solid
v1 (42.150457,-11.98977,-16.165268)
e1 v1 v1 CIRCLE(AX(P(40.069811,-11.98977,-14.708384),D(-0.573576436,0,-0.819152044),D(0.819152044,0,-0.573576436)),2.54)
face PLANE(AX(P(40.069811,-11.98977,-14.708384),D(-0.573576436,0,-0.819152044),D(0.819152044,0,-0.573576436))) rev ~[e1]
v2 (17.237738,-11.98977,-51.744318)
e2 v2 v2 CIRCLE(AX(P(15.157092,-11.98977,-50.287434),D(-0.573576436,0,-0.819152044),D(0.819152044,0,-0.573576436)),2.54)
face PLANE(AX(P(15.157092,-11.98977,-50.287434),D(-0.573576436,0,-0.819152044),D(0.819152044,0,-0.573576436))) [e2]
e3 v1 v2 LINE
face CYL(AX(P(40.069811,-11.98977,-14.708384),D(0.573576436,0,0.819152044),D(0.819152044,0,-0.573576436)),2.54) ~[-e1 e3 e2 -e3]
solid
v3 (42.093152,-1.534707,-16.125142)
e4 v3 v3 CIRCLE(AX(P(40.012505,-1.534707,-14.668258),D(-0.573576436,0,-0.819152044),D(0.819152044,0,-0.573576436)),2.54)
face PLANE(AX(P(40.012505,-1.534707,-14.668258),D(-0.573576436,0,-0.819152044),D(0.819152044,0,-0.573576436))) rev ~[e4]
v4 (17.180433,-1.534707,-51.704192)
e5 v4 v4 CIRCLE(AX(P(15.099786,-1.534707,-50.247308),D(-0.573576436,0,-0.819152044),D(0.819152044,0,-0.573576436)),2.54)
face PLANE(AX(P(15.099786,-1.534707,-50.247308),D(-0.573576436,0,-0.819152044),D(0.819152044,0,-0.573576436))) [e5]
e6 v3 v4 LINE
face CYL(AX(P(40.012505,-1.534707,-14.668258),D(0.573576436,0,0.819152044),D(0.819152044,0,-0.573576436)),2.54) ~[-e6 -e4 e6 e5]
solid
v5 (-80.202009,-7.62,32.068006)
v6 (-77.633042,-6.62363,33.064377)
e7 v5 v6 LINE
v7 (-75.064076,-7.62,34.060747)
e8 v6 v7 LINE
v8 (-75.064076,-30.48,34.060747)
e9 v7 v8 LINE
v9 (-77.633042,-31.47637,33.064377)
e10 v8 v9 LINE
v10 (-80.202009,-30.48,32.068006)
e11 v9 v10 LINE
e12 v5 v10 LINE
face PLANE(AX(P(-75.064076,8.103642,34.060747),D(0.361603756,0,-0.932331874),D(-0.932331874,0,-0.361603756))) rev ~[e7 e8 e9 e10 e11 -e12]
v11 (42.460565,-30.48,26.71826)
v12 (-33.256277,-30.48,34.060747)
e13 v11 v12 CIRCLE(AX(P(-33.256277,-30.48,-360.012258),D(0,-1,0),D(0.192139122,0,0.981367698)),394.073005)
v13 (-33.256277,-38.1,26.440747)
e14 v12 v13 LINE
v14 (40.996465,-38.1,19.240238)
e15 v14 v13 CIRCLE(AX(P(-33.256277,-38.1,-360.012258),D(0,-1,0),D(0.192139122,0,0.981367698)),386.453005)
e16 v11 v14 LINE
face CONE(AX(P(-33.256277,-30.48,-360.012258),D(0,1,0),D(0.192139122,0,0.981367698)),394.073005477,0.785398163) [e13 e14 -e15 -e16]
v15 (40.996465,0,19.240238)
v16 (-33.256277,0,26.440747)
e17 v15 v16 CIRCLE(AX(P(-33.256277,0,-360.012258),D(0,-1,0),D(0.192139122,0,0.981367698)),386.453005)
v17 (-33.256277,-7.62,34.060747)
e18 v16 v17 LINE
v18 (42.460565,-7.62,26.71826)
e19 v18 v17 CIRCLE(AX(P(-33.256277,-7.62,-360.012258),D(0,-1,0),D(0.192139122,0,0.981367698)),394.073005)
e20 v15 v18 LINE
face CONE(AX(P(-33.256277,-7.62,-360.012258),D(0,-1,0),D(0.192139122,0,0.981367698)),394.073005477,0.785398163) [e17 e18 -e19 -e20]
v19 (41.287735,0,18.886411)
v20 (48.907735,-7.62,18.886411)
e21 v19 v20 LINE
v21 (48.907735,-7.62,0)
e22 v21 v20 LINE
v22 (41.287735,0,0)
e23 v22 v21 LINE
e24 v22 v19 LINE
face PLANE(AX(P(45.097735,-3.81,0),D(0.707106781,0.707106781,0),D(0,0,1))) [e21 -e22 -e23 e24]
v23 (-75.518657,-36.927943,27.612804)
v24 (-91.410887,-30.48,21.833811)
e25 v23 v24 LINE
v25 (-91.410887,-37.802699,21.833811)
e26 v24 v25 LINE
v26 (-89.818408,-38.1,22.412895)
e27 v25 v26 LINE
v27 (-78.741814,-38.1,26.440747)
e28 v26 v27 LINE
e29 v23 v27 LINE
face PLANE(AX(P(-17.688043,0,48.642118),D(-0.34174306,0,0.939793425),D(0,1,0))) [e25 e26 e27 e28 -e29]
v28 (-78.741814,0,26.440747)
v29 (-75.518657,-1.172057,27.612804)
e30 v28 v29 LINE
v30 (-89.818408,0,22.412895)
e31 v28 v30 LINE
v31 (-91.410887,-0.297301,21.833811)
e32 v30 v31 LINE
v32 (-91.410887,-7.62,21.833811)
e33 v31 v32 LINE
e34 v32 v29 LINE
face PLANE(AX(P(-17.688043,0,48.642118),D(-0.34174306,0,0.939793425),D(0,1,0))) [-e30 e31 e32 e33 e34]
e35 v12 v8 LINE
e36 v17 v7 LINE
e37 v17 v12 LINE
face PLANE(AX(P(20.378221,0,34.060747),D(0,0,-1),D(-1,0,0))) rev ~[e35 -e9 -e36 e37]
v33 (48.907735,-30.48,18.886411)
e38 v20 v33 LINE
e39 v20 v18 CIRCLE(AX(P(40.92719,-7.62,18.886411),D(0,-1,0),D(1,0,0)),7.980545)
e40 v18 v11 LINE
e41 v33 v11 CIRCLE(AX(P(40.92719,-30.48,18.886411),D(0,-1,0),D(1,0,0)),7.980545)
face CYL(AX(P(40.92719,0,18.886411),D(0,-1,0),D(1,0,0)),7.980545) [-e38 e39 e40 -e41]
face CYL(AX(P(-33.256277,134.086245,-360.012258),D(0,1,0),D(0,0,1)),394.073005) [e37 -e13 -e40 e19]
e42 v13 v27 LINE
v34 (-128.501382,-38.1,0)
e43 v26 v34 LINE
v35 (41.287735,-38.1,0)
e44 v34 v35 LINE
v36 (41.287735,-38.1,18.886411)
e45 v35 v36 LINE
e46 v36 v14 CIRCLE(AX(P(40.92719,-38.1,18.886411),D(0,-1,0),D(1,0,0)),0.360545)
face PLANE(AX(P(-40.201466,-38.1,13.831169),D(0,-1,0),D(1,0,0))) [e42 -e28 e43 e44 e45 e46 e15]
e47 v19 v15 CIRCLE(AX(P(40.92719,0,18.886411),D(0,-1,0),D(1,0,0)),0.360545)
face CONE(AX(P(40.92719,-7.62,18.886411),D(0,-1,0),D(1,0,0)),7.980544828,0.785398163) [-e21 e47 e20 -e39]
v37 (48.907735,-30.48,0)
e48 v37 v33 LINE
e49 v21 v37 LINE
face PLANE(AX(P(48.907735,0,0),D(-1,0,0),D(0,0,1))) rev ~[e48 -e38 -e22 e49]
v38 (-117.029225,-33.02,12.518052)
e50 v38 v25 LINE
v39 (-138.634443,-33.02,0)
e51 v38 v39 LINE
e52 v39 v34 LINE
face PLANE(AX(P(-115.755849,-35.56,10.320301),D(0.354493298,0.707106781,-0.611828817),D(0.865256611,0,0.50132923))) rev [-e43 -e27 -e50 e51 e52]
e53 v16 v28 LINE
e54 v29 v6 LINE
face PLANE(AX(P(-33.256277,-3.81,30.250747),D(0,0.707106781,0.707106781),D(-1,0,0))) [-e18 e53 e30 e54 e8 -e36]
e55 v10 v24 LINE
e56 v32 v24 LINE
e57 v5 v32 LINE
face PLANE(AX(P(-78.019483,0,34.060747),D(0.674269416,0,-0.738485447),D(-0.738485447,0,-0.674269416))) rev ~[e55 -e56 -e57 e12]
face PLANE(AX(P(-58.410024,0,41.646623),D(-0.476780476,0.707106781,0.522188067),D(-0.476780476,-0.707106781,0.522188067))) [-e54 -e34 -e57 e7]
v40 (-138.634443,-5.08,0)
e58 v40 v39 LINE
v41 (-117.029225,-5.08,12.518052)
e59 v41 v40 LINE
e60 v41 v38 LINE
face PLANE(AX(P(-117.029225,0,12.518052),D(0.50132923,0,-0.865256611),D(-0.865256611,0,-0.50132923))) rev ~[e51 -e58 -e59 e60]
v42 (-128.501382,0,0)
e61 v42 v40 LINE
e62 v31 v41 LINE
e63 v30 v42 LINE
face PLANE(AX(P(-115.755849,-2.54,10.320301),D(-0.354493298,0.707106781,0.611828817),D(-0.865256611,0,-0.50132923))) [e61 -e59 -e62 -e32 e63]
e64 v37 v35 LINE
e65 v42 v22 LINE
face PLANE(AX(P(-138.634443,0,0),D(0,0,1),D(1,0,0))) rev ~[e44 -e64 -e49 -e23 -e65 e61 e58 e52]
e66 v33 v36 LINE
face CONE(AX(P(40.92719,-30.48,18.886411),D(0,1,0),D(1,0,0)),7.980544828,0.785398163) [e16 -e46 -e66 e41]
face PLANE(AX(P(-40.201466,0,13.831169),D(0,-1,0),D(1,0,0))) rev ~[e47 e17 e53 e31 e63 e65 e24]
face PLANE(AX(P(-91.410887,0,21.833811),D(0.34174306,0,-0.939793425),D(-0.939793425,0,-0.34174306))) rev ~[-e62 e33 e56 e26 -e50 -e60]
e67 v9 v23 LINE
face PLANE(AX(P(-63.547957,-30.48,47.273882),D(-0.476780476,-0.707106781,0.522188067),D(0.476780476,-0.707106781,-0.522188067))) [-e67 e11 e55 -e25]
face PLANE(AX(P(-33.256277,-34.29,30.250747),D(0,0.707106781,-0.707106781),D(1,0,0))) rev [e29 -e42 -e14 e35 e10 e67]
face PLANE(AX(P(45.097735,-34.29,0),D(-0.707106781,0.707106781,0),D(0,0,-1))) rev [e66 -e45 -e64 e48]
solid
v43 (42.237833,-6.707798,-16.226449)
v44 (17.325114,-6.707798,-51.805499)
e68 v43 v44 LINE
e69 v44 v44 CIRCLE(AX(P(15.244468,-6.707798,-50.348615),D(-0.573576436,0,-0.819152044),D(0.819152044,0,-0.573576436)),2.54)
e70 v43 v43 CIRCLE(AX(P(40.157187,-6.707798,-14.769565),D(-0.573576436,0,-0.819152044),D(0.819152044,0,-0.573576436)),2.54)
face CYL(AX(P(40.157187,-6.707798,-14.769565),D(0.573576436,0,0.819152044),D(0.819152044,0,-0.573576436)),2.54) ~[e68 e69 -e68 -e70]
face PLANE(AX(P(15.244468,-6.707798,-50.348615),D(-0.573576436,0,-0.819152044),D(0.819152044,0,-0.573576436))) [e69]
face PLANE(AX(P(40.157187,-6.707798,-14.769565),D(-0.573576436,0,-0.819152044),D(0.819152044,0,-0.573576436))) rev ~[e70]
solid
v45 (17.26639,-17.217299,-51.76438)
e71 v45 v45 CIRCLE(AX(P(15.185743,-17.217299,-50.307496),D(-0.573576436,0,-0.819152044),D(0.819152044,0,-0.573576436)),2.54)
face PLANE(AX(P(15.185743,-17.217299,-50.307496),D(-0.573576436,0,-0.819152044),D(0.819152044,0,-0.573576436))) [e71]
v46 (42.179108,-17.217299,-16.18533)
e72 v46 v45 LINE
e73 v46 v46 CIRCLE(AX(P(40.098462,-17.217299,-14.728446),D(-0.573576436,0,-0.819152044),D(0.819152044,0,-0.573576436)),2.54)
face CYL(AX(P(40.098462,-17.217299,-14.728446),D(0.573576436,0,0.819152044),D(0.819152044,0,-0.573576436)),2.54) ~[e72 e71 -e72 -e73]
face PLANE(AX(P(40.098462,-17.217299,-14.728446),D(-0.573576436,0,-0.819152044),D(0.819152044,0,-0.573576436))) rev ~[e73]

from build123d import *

# Parameters (mm, degrees)
F1_DEPTH     = 38.1
F2_T1_DEPTH  = 306.2724899177
F3_R         = 7.9805448281
F4_T1_DEPTH  = 54.3072830908
F4_T6_DEPTH  = 57.3260545127
F4_T11_DEPTH = 57.3260545127
F5_SIZE      = 5.08
F6_SIZE      = 7.62
F9_START     = 35.306
F8_R         = 2.54
F9_DEPTH     = 43.434
F10_R        = 2.241694022
F10_R_2      = 2.5705753266
F11_DEPTH    = 25.4


# Not quite as in the source:
# - a fillet or chamfer that OpenCascade refuses, or shapes differently, is made with other operations: its cross-section is extruded or revolved along the edge and cut away or added


with BuildPart() as f1:
    # F0 (on Front) → F1 (new body)
    with BuildSketch(Plane.XZ):
        Polygon((-117.0292248611, 12.5180522991), (-138.6344432831, 0), (-86.75300612, 0), (-54.147850991, 0), (0, 0), (48.9077347708, 0), (48.9077347708, 25.4), (20.3782214363, 34.0607471224), (0, 34.0607471224), (-28.8206309022, 34.0607471224), (-58.22349694, 34.0607471224), (-78.0194832408, 34.0607471224), (-91.4108872046, 21.8338113525), align=None)
    extrude(amount=F1_DEPTH)

    # F2: fillet of radius 394.0730054862 on 1 edges, made by hand

    # F2_s2 → F2_t1 (cut)
    with BuildSketch(Plane.XZ.offset(-134.0862449589)):
        with BuildLine():
            ThreePointArc((-33.2562765472, 34.0607471224), (8.0533267448, 31.8895792548), (48.9077347708, 25.4))
            Line((48.9077347708, 25.4), (20.3782214363, 34.0607471224))
            Line((20.3782214363, 34.0607471224), (-33.2562765472, 34.0607471224))
        make_face()
    extrude(amount=F2_T1_DEPTH, mode=Mode.SUBTRACT)

    # F3
    f3_edges = [f1.edges().sort_by_distance(p)[0] for p in [
        (48.907735, -19.05, 25.4),
    ]]
    fillet(f3_edges, radius=F3_R)

    # F4: chamfer of 7.62 on 3 edges, made by hand

    # F4_s2 → F4_t1 (cut)
    with BuildSketch(Plane.XZ.offset(-8.1036415454)):
        Polygon((-75.0640757299, 34.0607471224), (-80.2020086769, 32.0680062271), (-78.0194832408, 34.0607471224), align=None)
    extrude(amount=F4_T1_DEPTH, mode=Mode.SUBTRACT)


with BuildPart() as f4_tool4:
    # F4_s5 → F4_t6 (new body)
    with BuildSketch(Plane(origin=(-11.1170923555, 0, -10.1503900969), x_dir=(0, 1, 0), z_dir=(-0.7384854468, 0, -0.6742694156))):
        Polygon((-30.48, -77.7595174297), (-38.1, -70.1395174297), (-38.1, -77.7595174297), align=None)
    extrude(amount=F4_T6_DEPTH)

    split(bisect_by=Plane(origin=(-17.688042782, 0, 48.6421181436), x_dir=(0, 1, 0), z_dir=(-0.34174306, 0, 0.9397934246)), keep=Keep.TOP)


with BuildPart() as f1_1:
    add(f1.part)

    # F4_t3: cut F4_tool4
    add(f4_tool4.part, mode=Mode.SUBTRACT)


with BuildPart() as f4_tool9:
    # F4_s10 → F4_t11 (new body)
    with BuildSketch(Plane(origin=(-11.1170923555, 0, -10.1503900969), x_dir=(0, 1, 0), z_dir=(-0.7384854468, 0, -0.6742694156))):
        Polygon((0, -70.1395174297), (-7.62, -77.7595174297), (0, -77.7595174297), align=None)
    extrude(amount=F4_T11_DEPTH)

    split(bisect_by=Plane(origin=(-17.688042782, 0, 48.6421181436), x_dir=(0, 1, 0), z_dir=(-0.34174306, 0, 0.9397934246)), keep=Keep.TOP)


with BuildPart() as f1_2:
    add(f1_1.part)

    # F4_t8: cut F4_tool9
    add(f4_tool9.part, mode=Mode.SUBTRACT)

    # F5
    f5_edges = [f1_2.edges().sort_by_distance(p)[0] for p in [
        (-127.831834, -38.1, 6.259026),
        (-127.831834, 0, 6.259026),
    ]]
    chamfer(f5_edges, length=F5_SIZE)

    # F6
    f6_edges = [f1_2.edges().sort_by_distance(p)[0] for p in [
        (-49.98732, -38.1, 34.060747),
        (-49.98732, 0, 34.060747),
        (48.907735, 0, 9.443205),
        (4.779733, 0, 32.22083),
        (47.088613, 0, 23.958488),
        (48.907735, -38.1, 9.443205),
        (4.779733, -38.1, 32.22083),
        (47.088613, -38.1, 23.958488),
    ]]
    chamfer(f6_edges, length=F6_SIZE)

    # F10 (on Front) → F11 (cut)
    with BuildSketch(Plane.XZ):
        with Locations((-84.3102261424, 5.0523453392)):
            Circle(F10_R)
        with Locations((19.8654048145, 7.4005662464)):
            Circle(F10_R_2)
    extrude(amount=-F11_DEPTH, mode=Mode.SUBTRACT)


with BuildPart() as f9:
    # F8 (on face) → F9 (new body)
    with BuildSketch(Plane(origin=(26.5225739082, 0, 37.8781610607), x_dir=(0.8191520443, 0, -0.5735764364), z_dir=(-0.5735764364, 0, -0.8191520443)).offset(F9_START)):
        with Locations((41.1896929145, 1.5347069129)):
            Circle(F8_R)
    extrude(amount=F9_DEPTH)


with BuildPart() as f9b:
    # F8 (on face) → F9, piece 2 (new body)
    with BuildSketch(Plane(origin=(26.5225739082, 0, 37.8781610607), x_dir=(0.8191520443, 0, -0.5735764364), z_dir=(-0.5735764364, 0, -0.8191520443)).offset(F9_START)):
        with Locations((41.3663163781, 6.7077982239)):
            Circle(F8_R)
    extrude(amount=F9_DEPTH)


with BuildPart() as f9c:
    # F8 (on face) → F9, piece 3 (new body)
    with BuildSketch(Plane(origin=(26.5225739082, 0, 37.8781610607), x_dir=(0.8191520443, 0, -0.5735764364), z_dir=(-0.5735764364, 0, -0.8191520443)).offset(F9_START)):
        with Locations((41.259650141, 11.9897695258)):
            Circle(F8_R)
    extrude(amount=F9_DEPTH)


with BuildPart() as f9d:
    # F8 (on face) → F9, piece 4 (new body)
    with BuildSketch(Plane(origin=(26.5225739082, 0, 37.8781610607), x_dir=(0.8191520443, 0, -0.5735764364), z_dir=(-0.5735764364, 0, -0.8191520443)).offset(F9_START)):
        with Locations((41.2946268916, 17.2172989696)):
            Circle(F8_R)
    extrude(amount=F9_DEPTH)


solid = Compound([f1_2.part, f9.part, f9b.part, f9c.part, f9d.part])
